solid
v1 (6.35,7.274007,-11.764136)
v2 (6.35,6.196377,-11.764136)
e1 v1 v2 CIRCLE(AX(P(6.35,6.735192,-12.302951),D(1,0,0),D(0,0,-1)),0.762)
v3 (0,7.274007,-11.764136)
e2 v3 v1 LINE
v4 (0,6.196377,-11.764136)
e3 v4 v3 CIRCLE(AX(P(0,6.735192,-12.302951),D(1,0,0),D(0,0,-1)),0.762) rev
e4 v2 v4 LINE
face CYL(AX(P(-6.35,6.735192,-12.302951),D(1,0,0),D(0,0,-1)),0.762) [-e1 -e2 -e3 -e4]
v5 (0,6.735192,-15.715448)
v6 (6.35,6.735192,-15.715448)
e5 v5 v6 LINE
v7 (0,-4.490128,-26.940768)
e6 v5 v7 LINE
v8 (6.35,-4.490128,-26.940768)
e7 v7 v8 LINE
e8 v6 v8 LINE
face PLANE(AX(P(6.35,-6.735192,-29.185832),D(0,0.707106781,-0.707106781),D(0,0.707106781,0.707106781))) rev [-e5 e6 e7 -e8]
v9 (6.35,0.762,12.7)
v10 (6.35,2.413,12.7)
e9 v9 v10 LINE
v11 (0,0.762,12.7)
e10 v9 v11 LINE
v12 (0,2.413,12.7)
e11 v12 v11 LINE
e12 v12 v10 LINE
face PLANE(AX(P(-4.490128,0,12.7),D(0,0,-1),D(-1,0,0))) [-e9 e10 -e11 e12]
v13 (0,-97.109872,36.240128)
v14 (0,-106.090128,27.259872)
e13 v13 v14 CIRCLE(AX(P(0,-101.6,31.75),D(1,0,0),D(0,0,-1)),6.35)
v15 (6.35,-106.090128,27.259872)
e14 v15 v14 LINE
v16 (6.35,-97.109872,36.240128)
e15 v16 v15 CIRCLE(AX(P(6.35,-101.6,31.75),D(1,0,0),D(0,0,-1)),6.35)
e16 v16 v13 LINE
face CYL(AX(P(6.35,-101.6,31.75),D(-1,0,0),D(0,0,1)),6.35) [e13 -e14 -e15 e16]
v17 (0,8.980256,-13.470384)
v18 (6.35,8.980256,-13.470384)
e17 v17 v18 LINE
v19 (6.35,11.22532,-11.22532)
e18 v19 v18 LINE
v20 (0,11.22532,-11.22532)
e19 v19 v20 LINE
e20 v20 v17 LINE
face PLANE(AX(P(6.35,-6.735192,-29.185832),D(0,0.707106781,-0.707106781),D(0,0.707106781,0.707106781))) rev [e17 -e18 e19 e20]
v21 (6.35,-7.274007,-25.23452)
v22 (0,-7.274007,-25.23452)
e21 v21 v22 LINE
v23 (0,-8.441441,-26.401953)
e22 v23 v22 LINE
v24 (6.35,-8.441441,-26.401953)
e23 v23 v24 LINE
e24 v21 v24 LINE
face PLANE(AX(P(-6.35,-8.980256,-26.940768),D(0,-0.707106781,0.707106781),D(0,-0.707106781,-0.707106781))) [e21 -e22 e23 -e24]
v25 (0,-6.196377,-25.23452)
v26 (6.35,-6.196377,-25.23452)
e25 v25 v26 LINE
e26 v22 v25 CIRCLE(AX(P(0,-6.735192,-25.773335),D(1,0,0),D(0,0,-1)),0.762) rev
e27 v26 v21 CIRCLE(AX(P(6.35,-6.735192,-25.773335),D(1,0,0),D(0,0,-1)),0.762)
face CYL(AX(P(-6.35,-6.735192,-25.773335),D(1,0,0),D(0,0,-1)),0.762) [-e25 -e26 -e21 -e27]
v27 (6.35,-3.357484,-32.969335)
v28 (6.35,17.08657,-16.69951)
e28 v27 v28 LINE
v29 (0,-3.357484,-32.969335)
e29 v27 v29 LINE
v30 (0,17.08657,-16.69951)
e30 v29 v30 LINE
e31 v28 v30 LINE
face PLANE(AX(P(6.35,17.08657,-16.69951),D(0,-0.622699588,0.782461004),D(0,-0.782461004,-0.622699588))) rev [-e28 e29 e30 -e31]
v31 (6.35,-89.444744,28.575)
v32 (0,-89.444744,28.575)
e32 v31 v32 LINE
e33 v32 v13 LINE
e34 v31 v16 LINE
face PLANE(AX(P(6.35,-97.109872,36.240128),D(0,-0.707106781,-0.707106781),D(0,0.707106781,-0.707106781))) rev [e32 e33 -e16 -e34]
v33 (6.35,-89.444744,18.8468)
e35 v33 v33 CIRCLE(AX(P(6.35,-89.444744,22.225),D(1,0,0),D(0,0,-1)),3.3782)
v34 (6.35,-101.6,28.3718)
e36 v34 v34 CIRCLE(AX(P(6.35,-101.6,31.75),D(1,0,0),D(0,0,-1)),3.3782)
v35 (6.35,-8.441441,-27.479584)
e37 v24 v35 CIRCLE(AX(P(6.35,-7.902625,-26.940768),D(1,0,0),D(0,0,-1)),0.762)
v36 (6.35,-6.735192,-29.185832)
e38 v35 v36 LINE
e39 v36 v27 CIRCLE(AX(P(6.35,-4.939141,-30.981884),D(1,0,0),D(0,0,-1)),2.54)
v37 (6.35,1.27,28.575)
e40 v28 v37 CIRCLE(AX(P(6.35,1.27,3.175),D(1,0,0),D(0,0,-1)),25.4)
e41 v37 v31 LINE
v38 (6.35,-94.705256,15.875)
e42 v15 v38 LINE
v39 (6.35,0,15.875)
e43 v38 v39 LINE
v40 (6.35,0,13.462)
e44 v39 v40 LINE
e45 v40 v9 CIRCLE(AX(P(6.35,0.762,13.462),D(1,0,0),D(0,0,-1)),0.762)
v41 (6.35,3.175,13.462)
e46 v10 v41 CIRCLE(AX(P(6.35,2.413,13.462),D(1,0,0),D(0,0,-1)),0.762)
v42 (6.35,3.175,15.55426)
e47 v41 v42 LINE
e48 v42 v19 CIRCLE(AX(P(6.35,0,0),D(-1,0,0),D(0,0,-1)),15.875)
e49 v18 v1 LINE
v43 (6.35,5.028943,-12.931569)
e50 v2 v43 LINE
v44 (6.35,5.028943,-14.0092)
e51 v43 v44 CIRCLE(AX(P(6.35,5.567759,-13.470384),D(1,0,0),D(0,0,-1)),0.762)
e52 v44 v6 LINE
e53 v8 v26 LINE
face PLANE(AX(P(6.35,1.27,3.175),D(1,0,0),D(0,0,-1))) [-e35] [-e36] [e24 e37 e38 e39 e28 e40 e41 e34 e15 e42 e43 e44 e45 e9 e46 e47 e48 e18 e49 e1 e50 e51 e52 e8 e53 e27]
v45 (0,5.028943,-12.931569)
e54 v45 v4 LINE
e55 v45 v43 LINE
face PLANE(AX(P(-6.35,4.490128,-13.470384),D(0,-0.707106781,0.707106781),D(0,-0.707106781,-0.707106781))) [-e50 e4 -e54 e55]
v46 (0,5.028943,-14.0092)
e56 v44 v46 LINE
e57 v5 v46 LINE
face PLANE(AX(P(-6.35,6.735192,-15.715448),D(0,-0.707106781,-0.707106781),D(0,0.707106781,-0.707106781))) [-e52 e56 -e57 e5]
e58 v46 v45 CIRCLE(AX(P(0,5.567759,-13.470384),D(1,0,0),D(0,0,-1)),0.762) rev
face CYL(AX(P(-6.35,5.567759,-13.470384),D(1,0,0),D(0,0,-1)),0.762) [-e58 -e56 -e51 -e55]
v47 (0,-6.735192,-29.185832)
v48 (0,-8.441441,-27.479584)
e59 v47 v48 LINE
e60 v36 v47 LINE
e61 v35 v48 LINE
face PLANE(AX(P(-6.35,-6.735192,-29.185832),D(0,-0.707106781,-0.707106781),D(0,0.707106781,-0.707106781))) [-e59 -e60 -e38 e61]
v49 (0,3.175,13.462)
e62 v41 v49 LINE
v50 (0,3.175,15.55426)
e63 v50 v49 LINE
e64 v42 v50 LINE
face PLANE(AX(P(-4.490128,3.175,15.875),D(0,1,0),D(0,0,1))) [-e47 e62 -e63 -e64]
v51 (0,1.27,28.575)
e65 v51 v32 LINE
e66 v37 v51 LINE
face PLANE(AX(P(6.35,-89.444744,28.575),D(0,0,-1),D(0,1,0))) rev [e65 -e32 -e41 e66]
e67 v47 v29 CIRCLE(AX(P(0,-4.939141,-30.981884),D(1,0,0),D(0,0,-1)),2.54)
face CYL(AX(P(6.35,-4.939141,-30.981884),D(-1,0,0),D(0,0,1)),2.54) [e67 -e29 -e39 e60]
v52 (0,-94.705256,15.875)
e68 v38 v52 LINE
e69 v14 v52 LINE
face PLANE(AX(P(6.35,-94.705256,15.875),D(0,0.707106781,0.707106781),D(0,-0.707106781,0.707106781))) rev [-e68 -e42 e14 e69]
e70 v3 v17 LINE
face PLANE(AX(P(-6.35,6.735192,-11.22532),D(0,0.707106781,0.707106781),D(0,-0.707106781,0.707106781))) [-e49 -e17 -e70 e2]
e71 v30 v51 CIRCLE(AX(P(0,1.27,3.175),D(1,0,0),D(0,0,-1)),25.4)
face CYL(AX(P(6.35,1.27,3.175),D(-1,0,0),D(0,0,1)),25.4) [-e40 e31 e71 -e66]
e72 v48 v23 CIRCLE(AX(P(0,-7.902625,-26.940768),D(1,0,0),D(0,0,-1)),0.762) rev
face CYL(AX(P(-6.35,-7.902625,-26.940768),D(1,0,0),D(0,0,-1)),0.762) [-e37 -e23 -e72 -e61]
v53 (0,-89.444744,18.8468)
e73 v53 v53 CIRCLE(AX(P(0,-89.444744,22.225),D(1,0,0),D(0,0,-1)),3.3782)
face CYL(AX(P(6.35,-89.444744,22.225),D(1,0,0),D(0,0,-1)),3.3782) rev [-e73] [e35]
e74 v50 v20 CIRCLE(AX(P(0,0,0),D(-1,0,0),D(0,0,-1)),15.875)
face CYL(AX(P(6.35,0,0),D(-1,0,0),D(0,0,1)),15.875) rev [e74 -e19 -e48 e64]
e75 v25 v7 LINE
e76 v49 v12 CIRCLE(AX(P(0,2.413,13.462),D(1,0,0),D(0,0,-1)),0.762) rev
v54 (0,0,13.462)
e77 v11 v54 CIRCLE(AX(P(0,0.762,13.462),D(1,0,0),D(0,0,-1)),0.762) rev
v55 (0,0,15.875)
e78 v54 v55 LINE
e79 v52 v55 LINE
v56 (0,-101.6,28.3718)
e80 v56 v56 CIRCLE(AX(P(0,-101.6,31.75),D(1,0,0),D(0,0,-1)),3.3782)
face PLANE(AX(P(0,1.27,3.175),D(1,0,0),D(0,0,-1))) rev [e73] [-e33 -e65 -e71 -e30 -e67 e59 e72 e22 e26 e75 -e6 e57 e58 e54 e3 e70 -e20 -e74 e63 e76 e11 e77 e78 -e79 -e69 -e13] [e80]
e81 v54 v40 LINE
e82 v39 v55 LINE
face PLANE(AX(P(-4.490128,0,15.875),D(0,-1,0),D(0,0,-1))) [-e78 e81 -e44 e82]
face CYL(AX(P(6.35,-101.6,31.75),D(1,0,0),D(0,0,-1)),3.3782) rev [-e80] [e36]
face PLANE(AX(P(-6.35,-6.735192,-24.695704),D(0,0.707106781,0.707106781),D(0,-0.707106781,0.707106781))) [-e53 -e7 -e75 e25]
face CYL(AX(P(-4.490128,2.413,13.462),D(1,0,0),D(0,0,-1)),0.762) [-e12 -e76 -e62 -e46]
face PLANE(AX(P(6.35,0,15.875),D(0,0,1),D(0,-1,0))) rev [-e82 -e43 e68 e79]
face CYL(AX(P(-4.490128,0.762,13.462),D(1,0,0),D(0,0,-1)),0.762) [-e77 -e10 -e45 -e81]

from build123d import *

# Parameters (mm, degrees)
BOSS_EXTRUDE1_DEPTH         = 6.35
F_1_4_CLEARANCE_HOLE1_D     = 6.7564
F_1_4_CLEARANCE_HOLE1_DEPTH = 8.382
F_1_4_CLEARANCE_HOLE1_TIP   = 2.029827343
BOSS_EXTRUDE2_DEPTH         = 6.35
CRVPATTERN2_START           = 12.7
CRVPATTERN2_OUTLINE_W       = 6.35
CRVPATTERN2_OUTLINE_H       = 3.175
CRVPATTERN2_DEPTH           = 3.175
SKETCH5_W                   = 3.175
SKETCH5_H                   = 3.175
BOSS_EXTRUDE3_DEPTH         = 6.35
FILLET1_R                   = 0.762


# Read off the part's stored shape, not the designer's step: CrvPattern2
with BuildPart() as part:
    # Sketch1 → Boss-Extrude1 (new body)
    with BuildSketch(Plane(origin=(0, 0, 0), x_dir=(0, 0, -1), z_dir=(1, 0, 0))):
        with BuildLine():
            Line((-28.575, -89.444743879), (-28.575, 1.27))
            ThreePointArc((-28.575, 1.27), (-11.551976139, 25.24887134), (16.699509509, 17.086569533))
            Line((16.699509509, 17.086569533), (32.969334569, -3.357483913))
            ThreePointArc((32.969334569, -3.357483913), (32.673446977, -6.833926713), (29.185832393, -6.735192091))
            Line((29.185832393, -6.735192091), (11.225320151, 11.225320151))
            ThreePointArc((11.225320151, 11.225320151), (-6.075099489, 14.666587579), (-15.875, 0))
            Line((-15.875, 0), (-15.875, -94.705256121))
            Line((-15.875, -94.705256121), (-27.259871939, -106.090128061))
            ThreePointArc((-27.259871939, -106.090128061), (-36.240128061, -106.090128061), (-36.240128061, -97.109871939))
            Line((-36.240128061, -97.109871939), (-28.575, -89.444743879))
        make_face()
    extrude(amount=BOSS_EXTRUDE1_DEPTH)

    # 1/4 Clearance Hole1
    with Locations(Plane(origin=(6.35, 0, 0), x_dir=(0, 0, -1), z_dir=(1, 0, 0))):
        with Locations((-22.225, -89.444743879), (-31.75, -101.6)):
            Hole(F_1_4_CLEARANCE_HOLE1_D / 2, depth=F_1_4_CLEARANCE_HOLE1_DEPTH)
            with Locations((0, 0, -(F_1_4_CLEARANCE_HOLE1_DEPTH + F_1_4_CLEARANCE_HOLE1_TIP / 2))):  # 118° drill point
                Cone(0, F_1_4_CLEARANCE_HOLE1_D / 2, F_1_4_CLEARANCE_HOLE1_TIP, mode=Mode.SUBTRACT)

    # Sketch4 → Boss-Extrude2 (add)
    with BuildSketch(Plane(origin=(6.35, 0, 0), x_dir=(0, 0, -1), z_dir=(1, 0, 0))):
        Polygon((29.185832393, -6.735192091), (26.940768363, -8.980256121), (24.695704333, -6.735192091), (26.940768363, -4.490128061), align=None)
    extrude(amount=-BOSS_EXTRUDE2_DEPTH)

    # CrvPattern2 outline → CrvPattern2 (add)
    with BuildSketch(Plane(origin=(0, 0, 0), x_dir=(1, 0, 0), z_dir=(0, 0.7071067811865476, -0.7071067811865476)).offset(CRVPATTERN2_START)):
        with Locations((3.175, 4.7625)):
            Rectangle(CRVPATTERN2_OUTLINE_W, CRVPATTERN2_OUTLINE_H)
    extrude(amount=CRVPATTERN2_DEPTH)

    # Sketch5 → Boss-Extrude3 (add)
    with BuildSketch(Plane(origin=(6.35, 0, 0), x_dir=(0, 0, -1), z_dir=(1, 0, 0))):
        with Locations((-14.2875, 1.5875)):
            Rectangle(SKETCH5_W, SKETCH5_H)
    extrude(amount=-BOSS_EXTRUDE3_DEPTH)

    # Fillet1
    fillet1_edges = [part.edges().sort_by_distance(p)[0] for p in [
        (3.175, 4.490128061, -13.470384182),
        (3.175, 6.735192091, -11.225320151),
        (3.175, 3.175, 12.7),
        (3.175, 0, 12.7),
        (3.175, -8.980256121, -26.940768363),
        (3.175, -6.735192091, -24.695704333),
    ]]
    fillet(fillet1_edges, radius=FILLET1_R)


solid = part.part
